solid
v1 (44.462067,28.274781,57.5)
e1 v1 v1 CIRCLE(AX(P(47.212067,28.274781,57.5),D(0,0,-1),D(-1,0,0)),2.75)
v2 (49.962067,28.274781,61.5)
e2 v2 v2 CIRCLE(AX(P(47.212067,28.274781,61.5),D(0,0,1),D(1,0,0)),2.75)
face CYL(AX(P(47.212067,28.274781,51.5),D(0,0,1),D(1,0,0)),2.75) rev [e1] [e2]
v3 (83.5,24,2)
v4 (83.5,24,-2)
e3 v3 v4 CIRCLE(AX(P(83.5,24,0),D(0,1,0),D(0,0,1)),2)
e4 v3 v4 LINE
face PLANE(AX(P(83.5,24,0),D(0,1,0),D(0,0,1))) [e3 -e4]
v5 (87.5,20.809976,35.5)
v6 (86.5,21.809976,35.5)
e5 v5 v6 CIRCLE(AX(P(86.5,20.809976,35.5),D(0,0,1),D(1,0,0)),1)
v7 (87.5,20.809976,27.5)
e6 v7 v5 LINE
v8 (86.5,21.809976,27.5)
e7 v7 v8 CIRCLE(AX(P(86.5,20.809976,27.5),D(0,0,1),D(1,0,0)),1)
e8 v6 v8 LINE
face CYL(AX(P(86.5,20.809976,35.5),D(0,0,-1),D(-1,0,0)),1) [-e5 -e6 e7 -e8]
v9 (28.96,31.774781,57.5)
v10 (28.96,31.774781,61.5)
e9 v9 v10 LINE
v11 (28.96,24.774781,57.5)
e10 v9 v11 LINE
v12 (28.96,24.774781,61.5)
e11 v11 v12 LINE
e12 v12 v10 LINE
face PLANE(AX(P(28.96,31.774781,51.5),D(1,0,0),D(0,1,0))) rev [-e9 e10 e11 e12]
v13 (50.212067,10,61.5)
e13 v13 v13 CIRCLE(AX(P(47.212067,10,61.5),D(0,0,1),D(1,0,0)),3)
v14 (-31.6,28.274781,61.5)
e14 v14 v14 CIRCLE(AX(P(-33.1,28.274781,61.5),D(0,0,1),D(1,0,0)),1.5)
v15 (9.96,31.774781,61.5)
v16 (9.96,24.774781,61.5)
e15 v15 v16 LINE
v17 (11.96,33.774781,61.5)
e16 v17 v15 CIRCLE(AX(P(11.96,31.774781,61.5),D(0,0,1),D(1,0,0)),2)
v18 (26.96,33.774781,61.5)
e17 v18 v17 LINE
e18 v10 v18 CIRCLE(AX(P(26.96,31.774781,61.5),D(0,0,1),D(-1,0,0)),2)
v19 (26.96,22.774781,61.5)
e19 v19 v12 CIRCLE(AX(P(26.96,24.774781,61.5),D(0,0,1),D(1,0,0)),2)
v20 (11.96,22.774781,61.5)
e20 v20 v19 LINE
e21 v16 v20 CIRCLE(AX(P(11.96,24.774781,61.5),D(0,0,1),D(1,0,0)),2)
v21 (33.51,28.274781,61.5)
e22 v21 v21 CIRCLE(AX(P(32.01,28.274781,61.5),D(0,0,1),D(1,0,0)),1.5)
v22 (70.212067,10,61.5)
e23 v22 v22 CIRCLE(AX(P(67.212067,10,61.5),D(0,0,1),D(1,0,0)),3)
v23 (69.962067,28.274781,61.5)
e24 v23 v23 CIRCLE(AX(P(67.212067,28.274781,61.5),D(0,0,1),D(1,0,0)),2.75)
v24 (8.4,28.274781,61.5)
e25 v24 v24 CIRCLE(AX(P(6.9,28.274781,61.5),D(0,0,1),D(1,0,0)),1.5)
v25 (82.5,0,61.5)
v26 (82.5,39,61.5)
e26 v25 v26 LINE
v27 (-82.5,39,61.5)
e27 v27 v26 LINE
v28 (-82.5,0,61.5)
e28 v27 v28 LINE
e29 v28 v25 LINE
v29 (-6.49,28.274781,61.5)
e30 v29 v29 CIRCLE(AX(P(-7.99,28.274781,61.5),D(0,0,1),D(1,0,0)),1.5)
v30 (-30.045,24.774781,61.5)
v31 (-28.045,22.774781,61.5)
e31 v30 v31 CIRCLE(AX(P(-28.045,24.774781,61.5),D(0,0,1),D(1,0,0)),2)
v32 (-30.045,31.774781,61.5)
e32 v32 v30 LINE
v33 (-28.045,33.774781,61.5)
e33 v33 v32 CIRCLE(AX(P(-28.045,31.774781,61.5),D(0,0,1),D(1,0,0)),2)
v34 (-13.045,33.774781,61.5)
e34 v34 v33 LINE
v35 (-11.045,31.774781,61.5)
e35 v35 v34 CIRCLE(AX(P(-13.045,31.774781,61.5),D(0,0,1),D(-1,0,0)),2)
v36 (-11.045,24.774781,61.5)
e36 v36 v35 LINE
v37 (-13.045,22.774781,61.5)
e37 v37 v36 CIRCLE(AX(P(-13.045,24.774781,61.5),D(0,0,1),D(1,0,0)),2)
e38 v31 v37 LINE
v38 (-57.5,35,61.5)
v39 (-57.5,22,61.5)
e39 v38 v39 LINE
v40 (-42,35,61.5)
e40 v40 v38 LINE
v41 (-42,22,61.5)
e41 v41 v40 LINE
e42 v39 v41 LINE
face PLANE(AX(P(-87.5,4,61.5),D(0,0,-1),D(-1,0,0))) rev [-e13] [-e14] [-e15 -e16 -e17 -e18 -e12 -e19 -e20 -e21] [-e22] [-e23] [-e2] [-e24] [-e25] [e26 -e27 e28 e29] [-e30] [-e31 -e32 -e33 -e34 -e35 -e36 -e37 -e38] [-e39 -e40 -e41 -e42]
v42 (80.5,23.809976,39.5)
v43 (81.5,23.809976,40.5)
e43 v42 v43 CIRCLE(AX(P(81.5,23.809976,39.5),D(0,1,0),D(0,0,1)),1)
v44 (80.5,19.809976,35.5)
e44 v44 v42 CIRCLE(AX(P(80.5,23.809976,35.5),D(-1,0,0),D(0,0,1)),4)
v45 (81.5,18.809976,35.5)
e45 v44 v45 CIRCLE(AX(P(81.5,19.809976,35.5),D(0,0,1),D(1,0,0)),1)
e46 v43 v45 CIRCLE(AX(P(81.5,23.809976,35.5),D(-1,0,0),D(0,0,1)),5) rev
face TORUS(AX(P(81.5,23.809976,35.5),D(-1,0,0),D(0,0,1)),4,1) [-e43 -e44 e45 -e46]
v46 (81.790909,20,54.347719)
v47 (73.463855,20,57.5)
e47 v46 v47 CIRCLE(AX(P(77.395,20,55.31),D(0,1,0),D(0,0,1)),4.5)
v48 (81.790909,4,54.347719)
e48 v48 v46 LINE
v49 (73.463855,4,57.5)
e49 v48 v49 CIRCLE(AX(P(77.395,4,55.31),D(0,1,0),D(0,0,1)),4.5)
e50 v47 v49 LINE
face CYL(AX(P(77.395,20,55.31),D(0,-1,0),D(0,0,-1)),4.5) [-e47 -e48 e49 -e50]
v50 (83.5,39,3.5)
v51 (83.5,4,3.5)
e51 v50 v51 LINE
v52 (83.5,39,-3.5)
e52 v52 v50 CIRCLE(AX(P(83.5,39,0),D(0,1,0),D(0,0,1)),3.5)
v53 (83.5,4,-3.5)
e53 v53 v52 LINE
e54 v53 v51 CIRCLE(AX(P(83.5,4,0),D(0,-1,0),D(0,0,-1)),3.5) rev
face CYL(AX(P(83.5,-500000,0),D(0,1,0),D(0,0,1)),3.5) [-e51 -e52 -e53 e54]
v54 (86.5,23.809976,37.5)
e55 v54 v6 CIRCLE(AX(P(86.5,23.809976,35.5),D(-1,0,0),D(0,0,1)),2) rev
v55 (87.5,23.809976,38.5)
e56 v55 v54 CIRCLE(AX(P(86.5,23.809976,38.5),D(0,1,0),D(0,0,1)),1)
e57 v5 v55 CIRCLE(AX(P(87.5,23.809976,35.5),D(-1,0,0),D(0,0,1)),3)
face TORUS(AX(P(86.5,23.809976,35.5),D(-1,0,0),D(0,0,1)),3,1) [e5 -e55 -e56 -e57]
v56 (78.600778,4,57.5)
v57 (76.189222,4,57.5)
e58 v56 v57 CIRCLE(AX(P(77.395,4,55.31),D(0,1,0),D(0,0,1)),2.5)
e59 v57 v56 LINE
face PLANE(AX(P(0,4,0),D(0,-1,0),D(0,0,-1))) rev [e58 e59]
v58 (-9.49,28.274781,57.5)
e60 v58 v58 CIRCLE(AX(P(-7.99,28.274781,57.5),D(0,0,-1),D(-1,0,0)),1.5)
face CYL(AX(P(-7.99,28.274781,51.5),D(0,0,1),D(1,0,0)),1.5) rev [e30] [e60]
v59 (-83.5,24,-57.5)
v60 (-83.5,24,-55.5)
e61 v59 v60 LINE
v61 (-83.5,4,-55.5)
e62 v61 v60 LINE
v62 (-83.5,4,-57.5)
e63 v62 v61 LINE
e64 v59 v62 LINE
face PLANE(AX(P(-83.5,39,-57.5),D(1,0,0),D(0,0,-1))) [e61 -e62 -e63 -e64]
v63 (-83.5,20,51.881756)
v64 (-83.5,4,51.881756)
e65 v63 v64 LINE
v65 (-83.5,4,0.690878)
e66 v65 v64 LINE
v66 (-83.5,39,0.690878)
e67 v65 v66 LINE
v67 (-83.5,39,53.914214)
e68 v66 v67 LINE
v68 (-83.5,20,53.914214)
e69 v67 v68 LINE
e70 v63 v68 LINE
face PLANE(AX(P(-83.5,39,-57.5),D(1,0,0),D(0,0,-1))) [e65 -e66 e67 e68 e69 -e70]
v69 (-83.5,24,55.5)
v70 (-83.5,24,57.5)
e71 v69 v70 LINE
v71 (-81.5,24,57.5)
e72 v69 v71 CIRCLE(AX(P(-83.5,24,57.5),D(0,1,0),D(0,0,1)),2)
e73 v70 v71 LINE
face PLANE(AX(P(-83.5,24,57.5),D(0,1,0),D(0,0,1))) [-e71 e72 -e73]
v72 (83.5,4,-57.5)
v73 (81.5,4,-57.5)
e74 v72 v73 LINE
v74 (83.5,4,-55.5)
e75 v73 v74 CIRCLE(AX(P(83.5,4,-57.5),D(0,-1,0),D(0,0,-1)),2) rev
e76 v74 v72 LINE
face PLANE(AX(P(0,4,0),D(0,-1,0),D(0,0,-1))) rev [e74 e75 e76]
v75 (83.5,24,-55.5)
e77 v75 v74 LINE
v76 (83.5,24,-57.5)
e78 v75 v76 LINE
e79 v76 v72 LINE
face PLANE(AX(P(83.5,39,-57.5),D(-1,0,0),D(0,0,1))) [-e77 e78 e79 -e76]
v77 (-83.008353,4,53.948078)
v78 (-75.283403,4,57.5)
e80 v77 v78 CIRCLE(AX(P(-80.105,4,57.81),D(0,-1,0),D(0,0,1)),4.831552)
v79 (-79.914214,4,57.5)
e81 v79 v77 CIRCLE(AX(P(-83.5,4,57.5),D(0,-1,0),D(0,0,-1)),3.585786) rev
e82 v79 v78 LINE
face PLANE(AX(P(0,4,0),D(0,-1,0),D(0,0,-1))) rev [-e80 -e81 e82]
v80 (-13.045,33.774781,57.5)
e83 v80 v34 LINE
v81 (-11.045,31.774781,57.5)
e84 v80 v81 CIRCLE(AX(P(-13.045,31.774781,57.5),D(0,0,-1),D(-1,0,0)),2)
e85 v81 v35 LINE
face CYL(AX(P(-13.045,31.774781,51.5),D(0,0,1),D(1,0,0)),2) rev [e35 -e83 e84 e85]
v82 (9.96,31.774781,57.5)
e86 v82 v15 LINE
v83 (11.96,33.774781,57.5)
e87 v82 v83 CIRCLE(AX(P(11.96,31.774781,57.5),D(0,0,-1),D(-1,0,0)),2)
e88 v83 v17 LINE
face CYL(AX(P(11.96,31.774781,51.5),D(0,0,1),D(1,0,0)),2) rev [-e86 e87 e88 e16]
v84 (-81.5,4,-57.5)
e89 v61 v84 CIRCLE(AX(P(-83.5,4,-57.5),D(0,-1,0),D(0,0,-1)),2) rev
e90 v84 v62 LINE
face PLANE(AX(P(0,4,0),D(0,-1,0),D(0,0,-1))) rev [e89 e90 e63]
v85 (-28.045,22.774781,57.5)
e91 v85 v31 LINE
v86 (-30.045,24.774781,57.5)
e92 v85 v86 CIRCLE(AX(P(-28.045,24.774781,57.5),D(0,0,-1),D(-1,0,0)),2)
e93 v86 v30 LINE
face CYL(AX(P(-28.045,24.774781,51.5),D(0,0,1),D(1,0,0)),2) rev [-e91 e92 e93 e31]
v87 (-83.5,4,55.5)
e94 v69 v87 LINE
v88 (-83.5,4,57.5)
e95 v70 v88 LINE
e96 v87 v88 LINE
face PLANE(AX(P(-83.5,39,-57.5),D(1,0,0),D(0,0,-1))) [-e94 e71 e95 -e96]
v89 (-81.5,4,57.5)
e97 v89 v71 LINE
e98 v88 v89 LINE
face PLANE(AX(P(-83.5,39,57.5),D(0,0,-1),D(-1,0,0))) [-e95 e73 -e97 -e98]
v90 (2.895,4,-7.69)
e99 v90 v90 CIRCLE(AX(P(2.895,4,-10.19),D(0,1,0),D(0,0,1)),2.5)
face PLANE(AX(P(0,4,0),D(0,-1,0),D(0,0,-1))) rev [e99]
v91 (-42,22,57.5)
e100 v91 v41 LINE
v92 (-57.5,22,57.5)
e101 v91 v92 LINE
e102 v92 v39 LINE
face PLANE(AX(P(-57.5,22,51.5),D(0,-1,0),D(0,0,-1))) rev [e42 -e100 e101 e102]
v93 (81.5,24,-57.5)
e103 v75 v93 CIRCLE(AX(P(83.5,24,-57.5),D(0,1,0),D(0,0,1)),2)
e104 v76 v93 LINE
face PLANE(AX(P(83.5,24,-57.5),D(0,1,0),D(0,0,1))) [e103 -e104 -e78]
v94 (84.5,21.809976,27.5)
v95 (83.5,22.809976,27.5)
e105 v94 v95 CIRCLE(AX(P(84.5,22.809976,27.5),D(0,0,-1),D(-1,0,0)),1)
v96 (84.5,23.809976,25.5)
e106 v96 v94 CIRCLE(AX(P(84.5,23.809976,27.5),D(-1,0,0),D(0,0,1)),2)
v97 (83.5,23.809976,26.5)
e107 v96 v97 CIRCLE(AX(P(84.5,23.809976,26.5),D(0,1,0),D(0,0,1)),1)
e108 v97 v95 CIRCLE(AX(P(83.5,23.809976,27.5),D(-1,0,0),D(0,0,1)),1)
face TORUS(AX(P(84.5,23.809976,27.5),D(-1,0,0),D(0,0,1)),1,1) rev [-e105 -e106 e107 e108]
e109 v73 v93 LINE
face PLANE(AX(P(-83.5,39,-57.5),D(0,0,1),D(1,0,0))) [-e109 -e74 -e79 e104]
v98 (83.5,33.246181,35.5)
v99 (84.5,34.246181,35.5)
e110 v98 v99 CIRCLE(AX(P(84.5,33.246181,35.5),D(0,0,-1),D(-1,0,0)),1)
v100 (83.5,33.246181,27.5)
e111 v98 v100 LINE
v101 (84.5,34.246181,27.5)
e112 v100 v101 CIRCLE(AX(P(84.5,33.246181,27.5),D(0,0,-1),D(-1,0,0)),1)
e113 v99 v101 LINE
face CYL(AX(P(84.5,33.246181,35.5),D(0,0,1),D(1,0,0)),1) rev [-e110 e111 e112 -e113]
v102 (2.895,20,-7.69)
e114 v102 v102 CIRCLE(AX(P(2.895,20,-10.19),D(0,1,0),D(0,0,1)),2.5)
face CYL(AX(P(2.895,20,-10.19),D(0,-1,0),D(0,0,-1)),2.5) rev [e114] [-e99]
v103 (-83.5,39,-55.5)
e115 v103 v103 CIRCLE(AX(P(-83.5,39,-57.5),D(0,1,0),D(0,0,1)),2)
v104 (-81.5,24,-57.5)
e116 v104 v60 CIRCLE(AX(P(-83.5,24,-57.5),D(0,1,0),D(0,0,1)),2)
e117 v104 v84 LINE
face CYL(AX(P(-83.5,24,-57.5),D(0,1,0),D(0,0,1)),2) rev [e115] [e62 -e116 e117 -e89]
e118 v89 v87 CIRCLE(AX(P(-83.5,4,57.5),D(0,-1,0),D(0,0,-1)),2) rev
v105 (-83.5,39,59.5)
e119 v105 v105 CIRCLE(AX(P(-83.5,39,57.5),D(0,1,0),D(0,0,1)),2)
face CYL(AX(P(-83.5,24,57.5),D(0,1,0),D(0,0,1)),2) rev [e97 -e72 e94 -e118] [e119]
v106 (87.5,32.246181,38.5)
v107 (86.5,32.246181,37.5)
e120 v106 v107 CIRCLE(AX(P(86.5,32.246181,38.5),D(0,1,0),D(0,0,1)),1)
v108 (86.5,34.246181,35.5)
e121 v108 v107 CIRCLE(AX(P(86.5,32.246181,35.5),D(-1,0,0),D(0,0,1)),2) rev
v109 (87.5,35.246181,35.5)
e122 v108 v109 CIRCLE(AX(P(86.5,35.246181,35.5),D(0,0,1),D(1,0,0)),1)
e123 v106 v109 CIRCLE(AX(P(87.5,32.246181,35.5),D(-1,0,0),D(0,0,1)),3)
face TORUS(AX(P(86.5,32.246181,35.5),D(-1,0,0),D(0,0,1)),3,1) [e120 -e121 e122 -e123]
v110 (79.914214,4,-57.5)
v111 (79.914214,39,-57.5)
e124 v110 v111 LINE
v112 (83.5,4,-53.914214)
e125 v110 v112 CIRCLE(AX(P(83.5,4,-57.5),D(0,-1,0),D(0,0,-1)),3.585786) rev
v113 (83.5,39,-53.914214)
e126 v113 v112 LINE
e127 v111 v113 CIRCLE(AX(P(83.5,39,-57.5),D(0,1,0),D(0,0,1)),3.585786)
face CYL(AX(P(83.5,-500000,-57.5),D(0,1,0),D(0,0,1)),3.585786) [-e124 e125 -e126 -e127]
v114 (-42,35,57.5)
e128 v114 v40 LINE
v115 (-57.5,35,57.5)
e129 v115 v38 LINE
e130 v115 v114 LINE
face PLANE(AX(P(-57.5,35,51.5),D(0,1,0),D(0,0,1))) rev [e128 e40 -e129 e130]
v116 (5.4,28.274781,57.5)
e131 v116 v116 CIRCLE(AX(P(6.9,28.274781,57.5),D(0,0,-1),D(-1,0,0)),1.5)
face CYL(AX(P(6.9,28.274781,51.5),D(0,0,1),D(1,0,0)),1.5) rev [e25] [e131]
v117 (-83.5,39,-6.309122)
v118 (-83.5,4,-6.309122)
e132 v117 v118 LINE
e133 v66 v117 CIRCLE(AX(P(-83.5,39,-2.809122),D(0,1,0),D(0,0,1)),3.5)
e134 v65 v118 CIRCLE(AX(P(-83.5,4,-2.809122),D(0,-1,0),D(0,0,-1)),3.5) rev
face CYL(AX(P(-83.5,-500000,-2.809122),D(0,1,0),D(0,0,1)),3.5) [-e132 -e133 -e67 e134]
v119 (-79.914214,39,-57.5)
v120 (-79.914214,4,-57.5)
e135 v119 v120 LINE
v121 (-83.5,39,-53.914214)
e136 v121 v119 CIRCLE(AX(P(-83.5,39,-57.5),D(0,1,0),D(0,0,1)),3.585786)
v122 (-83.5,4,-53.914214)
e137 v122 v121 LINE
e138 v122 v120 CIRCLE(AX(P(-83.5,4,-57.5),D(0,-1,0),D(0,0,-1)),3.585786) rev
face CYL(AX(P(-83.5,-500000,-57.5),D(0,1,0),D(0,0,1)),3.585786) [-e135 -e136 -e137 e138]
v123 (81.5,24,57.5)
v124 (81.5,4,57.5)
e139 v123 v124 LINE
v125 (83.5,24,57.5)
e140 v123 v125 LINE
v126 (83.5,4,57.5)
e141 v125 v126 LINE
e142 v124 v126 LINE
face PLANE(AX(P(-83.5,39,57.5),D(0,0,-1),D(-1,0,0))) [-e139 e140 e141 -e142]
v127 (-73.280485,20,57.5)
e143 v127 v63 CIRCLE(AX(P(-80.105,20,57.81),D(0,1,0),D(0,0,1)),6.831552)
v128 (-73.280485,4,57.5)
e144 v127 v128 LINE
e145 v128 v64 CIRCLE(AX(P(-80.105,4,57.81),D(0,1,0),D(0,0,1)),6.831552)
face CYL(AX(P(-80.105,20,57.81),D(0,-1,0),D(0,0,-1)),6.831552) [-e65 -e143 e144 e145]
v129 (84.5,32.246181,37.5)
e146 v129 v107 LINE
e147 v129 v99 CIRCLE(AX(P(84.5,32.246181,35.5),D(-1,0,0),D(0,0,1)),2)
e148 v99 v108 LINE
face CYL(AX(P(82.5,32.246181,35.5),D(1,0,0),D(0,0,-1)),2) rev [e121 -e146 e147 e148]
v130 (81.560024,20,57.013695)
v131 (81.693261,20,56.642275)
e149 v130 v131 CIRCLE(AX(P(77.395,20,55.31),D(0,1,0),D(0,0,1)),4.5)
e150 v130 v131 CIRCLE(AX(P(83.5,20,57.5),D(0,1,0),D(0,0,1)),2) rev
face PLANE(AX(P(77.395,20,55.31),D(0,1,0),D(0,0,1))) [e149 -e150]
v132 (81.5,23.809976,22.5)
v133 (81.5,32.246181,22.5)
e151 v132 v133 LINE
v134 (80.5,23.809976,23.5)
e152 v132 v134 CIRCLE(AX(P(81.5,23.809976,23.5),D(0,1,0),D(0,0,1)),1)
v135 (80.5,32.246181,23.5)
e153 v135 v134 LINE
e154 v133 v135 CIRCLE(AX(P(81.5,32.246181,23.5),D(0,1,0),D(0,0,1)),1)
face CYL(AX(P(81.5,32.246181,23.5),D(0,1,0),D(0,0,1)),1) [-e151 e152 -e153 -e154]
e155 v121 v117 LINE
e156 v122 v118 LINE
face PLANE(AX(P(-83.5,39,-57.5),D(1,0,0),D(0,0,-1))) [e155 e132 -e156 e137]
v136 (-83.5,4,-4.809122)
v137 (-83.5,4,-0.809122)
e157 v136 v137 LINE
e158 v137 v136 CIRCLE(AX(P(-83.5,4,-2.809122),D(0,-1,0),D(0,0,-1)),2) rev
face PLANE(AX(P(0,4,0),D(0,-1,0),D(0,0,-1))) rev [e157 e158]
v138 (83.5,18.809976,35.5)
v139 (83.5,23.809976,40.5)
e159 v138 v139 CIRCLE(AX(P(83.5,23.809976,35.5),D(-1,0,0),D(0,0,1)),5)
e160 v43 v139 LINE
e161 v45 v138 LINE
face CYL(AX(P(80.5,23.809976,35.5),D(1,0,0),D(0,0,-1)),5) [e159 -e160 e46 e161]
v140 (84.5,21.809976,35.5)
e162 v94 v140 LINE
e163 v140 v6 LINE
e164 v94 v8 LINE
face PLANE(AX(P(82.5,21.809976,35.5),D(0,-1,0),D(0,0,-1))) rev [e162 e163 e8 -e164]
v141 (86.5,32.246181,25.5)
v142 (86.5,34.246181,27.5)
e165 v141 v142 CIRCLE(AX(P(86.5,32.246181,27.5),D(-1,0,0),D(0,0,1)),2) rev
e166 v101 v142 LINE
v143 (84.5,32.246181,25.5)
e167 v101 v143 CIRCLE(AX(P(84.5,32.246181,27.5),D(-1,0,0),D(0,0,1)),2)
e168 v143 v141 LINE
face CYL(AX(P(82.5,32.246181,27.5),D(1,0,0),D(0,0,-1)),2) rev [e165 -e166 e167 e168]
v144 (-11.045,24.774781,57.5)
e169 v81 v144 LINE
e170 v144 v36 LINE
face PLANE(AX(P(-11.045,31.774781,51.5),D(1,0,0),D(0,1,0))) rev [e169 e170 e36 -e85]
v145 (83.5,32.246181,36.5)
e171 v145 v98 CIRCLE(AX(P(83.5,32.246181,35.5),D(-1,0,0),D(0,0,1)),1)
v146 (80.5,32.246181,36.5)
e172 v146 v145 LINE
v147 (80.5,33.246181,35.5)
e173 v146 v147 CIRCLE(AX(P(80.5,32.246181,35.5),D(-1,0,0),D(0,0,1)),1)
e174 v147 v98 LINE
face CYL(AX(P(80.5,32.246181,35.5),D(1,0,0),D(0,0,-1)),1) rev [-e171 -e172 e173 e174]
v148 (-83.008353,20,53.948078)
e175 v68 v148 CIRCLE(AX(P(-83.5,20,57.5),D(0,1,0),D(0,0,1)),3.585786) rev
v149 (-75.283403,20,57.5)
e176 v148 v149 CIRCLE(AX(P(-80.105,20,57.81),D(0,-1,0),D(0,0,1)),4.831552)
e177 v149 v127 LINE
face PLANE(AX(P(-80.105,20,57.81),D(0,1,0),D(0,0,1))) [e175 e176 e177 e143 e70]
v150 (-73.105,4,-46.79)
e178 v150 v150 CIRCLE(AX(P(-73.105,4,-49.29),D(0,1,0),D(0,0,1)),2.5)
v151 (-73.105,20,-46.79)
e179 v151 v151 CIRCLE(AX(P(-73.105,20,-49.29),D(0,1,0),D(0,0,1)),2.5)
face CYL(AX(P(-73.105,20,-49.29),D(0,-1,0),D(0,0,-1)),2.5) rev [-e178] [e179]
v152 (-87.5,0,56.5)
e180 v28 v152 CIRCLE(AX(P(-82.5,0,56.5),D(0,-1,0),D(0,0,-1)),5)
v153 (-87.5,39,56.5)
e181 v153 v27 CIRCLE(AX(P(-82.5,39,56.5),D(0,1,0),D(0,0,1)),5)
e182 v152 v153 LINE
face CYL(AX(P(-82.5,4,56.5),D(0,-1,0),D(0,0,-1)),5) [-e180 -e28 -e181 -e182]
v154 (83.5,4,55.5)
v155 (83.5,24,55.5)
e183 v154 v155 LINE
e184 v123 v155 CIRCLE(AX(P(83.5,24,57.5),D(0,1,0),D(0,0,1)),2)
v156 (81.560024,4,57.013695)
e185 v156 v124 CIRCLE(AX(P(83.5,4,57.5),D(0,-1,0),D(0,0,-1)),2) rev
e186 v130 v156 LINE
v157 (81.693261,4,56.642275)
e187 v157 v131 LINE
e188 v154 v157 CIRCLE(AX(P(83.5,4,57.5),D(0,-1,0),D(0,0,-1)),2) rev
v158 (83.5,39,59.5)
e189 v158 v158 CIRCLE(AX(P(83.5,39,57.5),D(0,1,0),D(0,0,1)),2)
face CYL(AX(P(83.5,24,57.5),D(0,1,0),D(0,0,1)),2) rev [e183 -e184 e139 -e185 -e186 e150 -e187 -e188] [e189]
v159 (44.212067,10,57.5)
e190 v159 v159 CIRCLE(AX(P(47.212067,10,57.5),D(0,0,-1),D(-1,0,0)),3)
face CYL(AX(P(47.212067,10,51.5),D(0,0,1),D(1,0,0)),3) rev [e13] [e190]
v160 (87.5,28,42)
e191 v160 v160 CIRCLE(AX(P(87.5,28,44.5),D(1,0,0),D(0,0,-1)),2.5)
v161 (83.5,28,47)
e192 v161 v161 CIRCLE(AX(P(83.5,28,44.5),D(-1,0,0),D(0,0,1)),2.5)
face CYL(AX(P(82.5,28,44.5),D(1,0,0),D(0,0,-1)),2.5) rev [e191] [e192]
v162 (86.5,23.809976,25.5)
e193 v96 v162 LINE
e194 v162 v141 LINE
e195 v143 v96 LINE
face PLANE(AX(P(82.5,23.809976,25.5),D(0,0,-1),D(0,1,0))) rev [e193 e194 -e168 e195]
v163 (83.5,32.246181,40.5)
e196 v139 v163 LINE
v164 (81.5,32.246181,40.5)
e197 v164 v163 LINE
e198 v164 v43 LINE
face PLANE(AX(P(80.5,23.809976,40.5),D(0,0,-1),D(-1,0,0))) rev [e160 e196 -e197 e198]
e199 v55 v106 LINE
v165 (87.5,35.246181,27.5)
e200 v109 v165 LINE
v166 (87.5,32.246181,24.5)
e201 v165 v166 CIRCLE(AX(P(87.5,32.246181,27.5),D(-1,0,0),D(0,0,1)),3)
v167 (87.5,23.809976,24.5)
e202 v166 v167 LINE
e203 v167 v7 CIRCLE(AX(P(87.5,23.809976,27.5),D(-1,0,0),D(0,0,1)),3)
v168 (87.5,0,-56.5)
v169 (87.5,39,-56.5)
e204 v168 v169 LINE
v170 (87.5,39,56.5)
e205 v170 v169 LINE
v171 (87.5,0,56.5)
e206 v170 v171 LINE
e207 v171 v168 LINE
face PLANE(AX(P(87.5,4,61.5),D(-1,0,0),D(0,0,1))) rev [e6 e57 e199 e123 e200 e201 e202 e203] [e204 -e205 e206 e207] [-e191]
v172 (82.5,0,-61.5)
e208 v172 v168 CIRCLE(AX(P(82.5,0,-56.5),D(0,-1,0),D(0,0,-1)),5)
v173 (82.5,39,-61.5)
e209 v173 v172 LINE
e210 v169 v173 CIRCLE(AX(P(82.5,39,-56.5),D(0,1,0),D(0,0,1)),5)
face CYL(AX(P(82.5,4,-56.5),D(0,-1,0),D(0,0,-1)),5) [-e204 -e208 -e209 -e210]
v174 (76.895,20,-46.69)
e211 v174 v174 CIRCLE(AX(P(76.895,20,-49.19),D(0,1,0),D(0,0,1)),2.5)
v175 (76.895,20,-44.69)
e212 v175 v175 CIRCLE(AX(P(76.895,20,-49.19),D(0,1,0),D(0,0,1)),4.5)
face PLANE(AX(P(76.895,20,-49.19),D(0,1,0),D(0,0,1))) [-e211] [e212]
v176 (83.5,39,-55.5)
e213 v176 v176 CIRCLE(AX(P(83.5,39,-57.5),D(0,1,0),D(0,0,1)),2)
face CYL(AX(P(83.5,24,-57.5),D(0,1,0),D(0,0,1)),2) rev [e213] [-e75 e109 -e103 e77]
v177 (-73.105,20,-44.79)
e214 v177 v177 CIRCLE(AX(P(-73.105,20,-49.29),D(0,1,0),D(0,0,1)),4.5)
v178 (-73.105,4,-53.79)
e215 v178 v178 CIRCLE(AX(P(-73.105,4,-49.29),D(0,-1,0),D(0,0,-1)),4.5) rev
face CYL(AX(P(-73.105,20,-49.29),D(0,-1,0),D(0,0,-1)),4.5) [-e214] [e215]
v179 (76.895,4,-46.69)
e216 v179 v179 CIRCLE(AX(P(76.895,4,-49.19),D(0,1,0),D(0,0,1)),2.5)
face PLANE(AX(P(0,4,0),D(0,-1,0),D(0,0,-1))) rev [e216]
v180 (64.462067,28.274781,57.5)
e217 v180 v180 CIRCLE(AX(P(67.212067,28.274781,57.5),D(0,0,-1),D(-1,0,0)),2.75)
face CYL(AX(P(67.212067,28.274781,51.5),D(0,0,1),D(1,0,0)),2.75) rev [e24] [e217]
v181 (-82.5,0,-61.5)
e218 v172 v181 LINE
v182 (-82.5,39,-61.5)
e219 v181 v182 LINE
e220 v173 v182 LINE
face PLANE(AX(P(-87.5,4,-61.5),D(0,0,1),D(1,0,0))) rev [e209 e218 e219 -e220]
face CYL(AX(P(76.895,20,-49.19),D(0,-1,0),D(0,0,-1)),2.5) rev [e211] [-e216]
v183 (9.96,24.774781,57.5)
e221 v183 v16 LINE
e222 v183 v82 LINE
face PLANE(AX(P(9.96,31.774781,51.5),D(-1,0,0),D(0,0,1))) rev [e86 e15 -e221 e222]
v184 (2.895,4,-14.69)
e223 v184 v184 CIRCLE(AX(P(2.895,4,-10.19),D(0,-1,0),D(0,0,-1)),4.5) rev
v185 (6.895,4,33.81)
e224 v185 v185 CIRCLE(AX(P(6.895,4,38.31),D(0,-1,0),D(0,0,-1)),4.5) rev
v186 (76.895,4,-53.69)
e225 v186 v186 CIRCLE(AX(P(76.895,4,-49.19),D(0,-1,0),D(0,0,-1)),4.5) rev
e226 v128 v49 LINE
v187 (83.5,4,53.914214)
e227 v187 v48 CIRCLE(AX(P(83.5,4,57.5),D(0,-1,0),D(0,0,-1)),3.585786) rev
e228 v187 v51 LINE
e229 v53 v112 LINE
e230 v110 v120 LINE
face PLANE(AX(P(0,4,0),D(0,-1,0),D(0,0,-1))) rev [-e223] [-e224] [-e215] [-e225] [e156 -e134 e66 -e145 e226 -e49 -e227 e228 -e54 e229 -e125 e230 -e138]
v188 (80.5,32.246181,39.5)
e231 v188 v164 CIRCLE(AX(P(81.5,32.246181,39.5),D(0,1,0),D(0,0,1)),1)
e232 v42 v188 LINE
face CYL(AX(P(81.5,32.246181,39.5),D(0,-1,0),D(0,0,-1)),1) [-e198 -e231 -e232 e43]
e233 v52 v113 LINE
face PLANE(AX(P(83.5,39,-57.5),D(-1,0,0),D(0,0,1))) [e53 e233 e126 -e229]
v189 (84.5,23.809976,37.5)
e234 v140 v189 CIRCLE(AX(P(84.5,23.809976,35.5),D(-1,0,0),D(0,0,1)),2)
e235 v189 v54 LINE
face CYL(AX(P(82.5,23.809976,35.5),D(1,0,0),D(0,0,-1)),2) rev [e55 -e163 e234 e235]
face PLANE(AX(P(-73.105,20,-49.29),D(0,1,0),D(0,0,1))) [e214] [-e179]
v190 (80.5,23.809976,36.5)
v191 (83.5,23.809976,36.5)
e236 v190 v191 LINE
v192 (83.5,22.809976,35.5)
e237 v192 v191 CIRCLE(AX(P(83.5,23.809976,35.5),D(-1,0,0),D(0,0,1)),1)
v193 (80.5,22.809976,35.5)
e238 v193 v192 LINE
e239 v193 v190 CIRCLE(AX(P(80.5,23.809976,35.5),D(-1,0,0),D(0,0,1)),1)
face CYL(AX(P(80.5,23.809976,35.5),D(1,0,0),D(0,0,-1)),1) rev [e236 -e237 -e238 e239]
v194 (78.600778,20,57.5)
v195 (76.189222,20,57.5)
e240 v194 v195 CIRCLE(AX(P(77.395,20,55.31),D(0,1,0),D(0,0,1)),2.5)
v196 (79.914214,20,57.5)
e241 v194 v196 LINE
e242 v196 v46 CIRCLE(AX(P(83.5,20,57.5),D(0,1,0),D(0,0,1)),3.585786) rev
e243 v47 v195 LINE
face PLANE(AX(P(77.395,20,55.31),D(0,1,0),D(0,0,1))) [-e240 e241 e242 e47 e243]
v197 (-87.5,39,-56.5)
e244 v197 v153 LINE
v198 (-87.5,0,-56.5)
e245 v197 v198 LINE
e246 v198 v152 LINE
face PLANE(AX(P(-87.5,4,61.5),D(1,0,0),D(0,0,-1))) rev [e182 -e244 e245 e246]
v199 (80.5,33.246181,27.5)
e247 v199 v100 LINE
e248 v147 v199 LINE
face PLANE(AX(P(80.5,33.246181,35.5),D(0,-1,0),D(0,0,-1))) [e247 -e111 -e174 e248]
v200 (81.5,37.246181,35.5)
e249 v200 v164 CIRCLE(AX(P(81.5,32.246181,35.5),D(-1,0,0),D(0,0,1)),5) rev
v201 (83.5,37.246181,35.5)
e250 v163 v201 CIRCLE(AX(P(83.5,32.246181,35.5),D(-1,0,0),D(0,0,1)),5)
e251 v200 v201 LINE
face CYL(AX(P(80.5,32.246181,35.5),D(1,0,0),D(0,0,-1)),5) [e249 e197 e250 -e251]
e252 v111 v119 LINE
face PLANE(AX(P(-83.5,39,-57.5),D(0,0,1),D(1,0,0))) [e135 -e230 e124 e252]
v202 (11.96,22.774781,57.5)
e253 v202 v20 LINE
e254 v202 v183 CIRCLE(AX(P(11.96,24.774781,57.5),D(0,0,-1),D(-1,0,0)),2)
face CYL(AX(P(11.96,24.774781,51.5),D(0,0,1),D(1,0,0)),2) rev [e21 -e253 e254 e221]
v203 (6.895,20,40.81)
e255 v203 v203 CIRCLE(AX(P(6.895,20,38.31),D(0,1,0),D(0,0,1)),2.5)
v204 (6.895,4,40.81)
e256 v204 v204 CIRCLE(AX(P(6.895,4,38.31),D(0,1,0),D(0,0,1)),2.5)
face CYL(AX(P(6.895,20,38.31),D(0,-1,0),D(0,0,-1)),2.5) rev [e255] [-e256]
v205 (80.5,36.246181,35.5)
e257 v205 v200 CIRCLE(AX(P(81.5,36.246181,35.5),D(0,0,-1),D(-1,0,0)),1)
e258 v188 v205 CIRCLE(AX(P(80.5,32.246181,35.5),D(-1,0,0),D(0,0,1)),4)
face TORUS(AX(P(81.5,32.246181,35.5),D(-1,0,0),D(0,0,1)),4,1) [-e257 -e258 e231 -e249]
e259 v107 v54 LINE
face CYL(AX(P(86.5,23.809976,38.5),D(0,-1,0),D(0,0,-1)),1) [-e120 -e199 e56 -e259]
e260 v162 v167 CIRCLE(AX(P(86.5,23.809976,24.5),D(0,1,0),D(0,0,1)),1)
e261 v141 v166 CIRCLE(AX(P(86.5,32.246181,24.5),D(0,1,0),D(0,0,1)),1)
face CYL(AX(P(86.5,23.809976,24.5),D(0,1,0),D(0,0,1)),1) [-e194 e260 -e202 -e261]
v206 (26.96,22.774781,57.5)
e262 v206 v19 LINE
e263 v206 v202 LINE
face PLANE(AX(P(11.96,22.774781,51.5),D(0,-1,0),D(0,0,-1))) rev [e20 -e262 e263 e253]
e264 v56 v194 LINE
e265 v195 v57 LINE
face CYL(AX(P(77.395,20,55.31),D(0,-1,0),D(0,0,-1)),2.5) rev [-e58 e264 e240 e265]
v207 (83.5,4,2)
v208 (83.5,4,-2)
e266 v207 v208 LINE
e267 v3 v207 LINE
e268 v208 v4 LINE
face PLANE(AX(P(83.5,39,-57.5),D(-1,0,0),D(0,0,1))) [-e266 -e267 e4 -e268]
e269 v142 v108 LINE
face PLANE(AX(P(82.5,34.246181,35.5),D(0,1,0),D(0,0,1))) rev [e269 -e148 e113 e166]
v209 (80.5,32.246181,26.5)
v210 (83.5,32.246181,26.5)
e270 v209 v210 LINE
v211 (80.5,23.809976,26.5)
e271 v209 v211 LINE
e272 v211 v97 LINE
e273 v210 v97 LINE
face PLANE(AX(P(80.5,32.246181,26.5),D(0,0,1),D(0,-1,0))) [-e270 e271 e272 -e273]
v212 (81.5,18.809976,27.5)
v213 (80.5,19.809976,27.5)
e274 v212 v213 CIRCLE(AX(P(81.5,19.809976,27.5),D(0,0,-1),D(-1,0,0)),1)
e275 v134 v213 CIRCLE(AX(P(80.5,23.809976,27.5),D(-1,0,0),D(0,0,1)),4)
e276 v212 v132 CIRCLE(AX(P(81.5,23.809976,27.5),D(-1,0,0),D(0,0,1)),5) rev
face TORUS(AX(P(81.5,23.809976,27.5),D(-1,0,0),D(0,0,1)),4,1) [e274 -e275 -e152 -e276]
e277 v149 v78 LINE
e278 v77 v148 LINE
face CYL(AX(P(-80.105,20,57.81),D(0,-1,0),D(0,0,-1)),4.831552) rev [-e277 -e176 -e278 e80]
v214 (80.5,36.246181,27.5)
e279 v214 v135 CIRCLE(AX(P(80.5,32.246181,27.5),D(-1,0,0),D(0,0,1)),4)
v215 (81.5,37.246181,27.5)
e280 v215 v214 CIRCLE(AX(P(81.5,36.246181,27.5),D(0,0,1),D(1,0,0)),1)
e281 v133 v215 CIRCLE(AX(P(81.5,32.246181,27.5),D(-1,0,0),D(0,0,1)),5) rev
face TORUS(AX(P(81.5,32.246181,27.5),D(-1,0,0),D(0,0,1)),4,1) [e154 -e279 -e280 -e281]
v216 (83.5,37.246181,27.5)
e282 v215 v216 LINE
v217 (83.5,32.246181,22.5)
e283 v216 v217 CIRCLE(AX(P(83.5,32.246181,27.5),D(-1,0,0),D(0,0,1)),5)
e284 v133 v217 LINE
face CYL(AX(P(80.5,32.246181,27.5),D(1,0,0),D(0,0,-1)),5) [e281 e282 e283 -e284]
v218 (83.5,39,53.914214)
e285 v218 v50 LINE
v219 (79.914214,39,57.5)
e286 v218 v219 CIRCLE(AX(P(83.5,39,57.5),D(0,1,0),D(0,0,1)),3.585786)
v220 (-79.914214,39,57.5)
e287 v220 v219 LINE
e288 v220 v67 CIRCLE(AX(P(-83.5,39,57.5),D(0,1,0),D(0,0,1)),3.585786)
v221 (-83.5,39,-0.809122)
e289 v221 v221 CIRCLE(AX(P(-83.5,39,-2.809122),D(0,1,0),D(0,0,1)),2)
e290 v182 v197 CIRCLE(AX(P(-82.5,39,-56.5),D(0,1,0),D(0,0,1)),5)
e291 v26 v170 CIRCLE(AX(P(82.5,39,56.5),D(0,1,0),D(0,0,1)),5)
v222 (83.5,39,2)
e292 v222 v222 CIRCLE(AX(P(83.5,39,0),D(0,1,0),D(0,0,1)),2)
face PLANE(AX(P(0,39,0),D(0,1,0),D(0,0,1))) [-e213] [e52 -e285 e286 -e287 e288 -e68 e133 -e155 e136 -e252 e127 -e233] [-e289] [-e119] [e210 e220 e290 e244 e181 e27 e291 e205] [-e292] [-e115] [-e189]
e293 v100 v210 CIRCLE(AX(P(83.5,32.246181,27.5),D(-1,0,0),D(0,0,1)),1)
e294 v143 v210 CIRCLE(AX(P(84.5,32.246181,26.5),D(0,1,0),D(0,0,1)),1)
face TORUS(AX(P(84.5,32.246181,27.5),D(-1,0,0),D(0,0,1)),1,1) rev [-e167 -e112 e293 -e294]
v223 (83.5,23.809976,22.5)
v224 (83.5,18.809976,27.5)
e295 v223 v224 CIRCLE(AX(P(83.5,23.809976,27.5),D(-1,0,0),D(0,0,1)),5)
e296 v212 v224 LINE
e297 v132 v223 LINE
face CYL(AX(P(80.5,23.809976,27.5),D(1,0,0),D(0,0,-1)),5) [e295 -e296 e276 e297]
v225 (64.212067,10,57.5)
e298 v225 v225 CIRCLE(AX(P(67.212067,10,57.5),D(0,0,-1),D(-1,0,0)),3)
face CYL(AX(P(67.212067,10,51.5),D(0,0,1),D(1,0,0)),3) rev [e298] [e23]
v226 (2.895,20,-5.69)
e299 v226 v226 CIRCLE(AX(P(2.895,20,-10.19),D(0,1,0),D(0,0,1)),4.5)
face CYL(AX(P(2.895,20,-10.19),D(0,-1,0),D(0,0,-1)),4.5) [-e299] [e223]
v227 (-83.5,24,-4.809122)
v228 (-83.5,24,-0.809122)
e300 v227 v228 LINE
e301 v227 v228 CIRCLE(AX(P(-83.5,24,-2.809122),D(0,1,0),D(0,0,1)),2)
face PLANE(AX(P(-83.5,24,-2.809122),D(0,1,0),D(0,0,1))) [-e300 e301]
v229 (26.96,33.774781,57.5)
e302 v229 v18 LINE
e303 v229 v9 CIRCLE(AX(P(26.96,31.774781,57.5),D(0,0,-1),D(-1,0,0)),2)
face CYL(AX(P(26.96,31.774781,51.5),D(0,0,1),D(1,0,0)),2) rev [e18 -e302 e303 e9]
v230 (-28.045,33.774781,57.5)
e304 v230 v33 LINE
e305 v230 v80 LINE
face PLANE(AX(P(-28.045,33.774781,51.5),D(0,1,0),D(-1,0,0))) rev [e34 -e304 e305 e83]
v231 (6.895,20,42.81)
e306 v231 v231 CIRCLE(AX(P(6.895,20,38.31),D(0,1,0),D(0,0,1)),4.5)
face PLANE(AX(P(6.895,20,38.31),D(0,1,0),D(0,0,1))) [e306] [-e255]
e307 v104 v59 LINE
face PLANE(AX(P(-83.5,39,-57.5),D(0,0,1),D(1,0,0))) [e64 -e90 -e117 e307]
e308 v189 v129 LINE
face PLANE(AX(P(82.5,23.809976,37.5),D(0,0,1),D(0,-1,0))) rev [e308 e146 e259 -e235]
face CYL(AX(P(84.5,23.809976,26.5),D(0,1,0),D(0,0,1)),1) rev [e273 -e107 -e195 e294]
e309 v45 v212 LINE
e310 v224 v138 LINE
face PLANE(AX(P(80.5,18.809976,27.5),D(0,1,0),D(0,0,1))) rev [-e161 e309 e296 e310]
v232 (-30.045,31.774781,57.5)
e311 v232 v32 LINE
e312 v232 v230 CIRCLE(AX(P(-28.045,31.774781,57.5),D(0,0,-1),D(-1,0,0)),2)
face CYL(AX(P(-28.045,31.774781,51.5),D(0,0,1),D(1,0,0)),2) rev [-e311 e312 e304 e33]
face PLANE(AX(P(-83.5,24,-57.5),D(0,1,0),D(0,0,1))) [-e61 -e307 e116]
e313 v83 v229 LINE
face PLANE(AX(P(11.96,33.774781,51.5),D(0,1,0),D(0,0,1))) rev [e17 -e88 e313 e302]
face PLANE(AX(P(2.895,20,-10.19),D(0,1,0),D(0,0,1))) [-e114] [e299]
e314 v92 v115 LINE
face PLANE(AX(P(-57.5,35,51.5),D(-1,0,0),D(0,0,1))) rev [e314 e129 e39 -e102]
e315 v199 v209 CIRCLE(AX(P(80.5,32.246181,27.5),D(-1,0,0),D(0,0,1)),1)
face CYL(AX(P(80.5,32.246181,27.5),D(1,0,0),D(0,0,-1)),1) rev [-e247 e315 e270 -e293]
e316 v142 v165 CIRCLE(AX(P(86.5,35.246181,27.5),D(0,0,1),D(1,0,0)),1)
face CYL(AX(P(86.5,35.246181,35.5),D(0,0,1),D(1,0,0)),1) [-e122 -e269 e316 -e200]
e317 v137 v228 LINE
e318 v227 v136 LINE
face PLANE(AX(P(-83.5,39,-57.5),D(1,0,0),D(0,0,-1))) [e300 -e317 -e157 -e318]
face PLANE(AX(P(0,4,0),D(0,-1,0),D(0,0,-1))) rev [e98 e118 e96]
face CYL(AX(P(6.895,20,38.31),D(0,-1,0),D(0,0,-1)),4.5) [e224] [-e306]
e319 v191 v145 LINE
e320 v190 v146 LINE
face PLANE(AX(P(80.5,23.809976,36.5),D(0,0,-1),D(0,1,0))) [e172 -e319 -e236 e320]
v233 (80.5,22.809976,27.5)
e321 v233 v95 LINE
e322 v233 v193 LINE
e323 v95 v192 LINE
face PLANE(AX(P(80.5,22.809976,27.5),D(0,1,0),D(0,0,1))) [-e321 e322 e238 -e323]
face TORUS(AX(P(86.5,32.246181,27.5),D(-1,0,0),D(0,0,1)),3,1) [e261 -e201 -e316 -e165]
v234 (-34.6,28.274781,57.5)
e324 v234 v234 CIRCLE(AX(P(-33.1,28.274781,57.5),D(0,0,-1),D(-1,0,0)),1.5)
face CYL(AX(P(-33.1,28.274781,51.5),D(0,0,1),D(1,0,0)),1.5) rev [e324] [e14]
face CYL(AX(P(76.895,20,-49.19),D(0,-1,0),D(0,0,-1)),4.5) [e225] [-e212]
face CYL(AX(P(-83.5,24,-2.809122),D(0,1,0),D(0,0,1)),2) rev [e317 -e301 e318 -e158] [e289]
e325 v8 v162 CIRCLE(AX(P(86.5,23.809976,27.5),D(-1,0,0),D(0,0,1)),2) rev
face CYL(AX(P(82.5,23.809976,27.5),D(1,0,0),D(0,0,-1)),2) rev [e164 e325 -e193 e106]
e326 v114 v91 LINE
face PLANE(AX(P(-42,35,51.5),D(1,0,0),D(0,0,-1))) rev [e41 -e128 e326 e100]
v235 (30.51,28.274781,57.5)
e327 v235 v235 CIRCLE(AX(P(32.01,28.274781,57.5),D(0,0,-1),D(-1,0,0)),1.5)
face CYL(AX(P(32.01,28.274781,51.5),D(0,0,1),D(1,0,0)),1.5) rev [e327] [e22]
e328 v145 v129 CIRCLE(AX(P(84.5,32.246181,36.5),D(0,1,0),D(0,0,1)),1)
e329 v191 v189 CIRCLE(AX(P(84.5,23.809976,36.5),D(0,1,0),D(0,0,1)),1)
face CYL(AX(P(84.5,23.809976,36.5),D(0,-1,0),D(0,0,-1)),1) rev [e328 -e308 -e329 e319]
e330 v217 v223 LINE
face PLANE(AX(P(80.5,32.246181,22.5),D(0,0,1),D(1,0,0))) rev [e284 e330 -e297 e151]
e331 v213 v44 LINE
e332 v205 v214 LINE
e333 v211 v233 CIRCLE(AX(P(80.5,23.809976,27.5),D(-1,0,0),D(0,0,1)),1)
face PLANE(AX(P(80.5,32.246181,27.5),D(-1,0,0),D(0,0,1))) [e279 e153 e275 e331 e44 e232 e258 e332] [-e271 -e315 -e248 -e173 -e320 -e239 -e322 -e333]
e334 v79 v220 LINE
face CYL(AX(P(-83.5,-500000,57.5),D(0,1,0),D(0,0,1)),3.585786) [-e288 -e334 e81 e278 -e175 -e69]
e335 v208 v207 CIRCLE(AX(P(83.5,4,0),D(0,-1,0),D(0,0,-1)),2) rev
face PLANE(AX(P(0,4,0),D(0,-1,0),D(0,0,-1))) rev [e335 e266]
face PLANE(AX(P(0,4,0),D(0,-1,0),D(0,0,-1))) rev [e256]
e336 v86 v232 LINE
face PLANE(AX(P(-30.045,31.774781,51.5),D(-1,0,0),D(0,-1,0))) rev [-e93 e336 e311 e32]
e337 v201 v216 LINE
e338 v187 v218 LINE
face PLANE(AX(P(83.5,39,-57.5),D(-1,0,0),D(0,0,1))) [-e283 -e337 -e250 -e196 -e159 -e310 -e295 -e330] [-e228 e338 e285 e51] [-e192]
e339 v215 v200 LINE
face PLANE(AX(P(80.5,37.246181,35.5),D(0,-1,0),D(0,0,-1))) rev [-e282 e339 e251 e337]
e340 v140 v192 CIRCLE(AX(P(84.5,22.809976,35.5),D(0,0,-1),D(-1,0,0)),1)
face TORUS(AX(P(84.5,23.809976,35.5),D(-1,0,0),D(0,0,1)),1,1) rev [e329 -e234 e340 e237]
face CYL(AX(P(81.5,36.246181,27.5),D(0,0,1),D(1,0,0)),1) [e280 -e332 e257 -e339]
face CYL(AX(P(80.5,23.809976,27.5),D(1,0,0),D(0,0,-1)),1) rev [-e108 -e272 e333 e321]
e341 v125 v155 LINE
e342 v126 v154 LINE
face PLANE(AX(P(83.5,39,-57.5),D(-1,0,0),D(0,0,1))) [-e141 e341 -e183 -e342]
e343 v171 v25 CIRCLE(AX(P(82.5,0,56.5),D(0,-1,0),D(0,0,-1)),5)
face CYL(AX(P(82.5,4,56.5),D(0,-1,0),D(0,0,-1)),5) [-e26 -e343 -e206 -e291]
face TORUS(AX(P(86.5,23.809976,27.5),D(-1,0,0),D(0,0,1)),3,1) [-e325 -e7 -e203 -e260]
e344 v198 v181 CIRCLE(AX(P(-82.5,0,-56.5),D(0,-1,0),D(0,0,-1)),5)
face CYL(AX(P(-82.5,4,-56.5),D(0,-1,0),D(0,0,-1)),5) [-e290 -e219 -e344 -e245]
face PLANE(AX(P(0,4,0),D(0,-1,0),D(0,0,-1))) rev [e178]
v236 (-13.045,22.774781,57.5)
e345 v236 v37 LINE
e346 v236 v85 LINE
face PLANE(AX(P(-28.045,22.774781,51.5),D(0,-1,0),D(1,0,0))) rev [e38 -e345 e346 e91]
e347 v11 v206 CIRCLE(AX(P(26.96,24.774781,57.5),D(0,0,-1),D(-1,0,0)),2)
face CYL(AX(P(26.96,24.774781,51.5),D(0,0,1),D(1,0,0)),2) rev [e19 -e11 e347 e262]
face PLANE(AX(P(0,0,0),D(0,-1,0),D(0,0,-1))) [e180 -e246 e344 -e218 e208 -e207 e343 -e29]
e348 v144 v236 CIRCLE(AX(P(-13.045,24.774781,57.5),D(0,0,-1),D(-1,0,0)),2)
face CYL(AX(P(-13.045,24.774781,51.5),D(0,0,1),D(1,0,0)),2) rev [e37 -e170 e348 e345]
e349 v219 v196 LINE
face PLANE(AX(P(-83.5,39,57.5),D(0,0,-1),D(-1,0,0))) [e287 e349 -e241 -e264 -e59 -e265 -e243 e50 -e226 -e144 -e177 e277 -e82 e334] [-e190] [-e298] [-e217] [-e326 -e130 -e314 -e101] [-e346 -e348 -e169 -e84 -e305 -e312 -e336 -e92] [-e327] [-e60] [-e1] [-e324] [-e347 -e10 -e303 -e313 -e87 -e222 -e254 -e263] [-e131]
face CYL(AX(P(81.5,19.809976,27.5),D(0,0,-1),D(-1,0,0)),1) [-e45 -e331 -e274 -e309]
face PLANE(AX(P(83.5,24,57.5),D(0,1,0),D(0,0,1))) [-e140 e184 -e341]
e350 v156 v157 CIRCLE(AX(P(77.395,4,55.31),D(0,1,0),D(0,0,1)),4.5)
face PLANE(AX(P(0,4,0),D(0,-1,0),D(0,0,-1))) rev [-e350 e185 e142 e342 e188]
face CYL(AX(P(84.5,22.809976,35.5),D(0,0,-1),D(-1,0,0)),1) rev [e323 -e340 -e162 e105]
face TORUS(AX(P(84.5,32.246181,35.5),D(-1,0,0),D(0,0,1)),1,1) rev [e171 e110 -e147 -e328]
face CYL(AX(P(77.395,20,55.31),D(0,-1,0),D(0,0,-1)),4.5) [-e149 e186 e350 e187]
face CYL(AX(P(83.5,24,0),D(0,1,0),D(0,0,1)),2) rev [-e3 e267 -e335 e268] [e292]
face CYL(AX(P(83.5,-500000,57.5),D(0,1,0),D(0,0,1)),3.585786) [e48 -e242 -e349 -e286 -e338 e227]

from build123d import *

# Parameters (mm, degrees)
IZIM1_W                     = 175
IZIM1_H                     = 123
Y_KSEKLIK_EKSTR_ZYON1_DEPTH = 4
IZIM2_W                     = 175
IZIM2_H                     = 123
IZIM2_W_2                   = 167
IZIM2_H_2                   = 115
Y_KSEKLIK_EKSTR_ZYON2_DEPTH = 35
IZIM3_R                     = 1.5
IZIM3_R_2                   = 2.75
IZIM3_R_3                   = 3
IZIM3_W                     = 15.5
IZIM3_H                     = 13
KES_EKSTR_ZYON1_DEPTH       = 10
IZIM5_R                     = 2.5
KES_EKSTR_ZYON3_DEPTH       = 5
RADYUS1_R                   = 5
IZIM6_R                     = 4.5
IZIM6_R_2                   = 2.5
Y_KSEKLIK_EKSTR_ZYON3_DEPTH = 16
IZIM7_R                     = 2
KES_EKSTR_ZYON4_DEPTH       = 15
Y_KSEKLIK_EKSTR_ZYON4_REACH = 115.84
IZIM8_R                     = 3.585786438
IZIM8_R_2                   = 2
IZIM8_R_3                   = 3.5
Y_KSEKLIK_EKSTR_ZYON5_DEPTH = 3
RADYUS2_R                   = 1
RADYUS3_R                   = 1
RADYUS4_R                   = 1


with BuildPart() as part:
    # Çizim1 → Yükseklik-Ekstrüzyon1 (new body)
    with BuildSketch(Plane(origin=(0, 0, 0), x_dir=(1, 0, 0), z_dir=(0, 1, 0))):
        Rectangle(IZIM1_W, IZIM1_H)
    extrude(amount=Y_KSEKLIK_EKSTR_ZYON1_DEPTH)

    # Çizim2 → Yükseklik-Ekstrüzyon2 (add)
    with BuildSketch(Plane(origin=(0, 4, 0), x_dir=(1, 0, 0), z_dir=(0, 1, 0))):
        Rectangle(IZIM2_W, IZIM2_H)
        Rectangle(IZIM2_W_2, IZIM2_H_2, mode=Mode.SUBTRACT)
    extrude(amount=Y_KSEKLIK_EKSTR_ZYON2_DEPTH)

    # Çizim3 → Kes-Ekstrüzyon1 (cut)
    with BuildSketch(Plane.XY.offset(61.5)):
        with Locations((-33.1, 28.27478079)):
            Circle(IZIM3_R)
        with Locations((-7.99, 28.27478079)):
            Circle(IZIM3_R)
        with Locations((6.9, 28.27478079)):
            Circle(IZIM3_R)
        with Locations((32.01, 28.27478079)):
            Circle(IZIM3_R)
        with Locations((47.212067108, 28.27478079)):
            Circle(IZIM3_R_2)
        with Locations((67.212067108, 28.27478079)):
            Circle(IZIM3_R_2)
        with Locations((47.212067108, 10)):
            Circle(IZIM3_R_3)
        with Locations((67.212067108, 10)):
            Circle(IZIM3_R_3)
        with Locations((-49.75, 28.5)):
            Rectangle(IZIM3_W, IZIM3_H)
        with BuildLine():
            Line((-28.045, 33.77478079), (-13.045, 33.77478079))
            ThreePointArc((-13.045, 33.77478079), (-11.630786438, 33.188994352), (-11.045, 31.77478079))
            Line((-11.045, 31.77478079), (-11.045, 24.77478079))
            ThreePointArc((-11.045, 24.77478079), (-11.630786438, 23.360567228), (-13.045, 22.77478079))
            Line((-13.045, 22.77478079), (-28.045, 22.77478079))
            ThreePointArc((-28.045, 22.77478079), (-29.459213562, 23.360567228), (-30.045, 24.77478079))
            Line((-30.045, 24.77478079), (-30.045, 31.77478079))
            ThreePointArc((-30.045, 31.77478079), (-29.459213562, 33.188994352), (-28.045, 33.77478079))
        make_face()
        with BuildLine():
            Line((11.96, 33.77478079), (26.96, 33.77478079))
            ThreePointArc((26.96, 33.77478079), (28.374213562, 33.188994352), (28.96, 31.77478079))
            Line((28.96, 31.77478079), (28.96, 24.77478079))
            ThreePointArc((28.96, 24.77478079), (28.374213562, 23.360567228), (26.96, 22.77478079))
            Line((26.96, 22.77478079), (11.96, 22.77478079))
            ThreePointArc((11.96, 22.77478079), (10.545786438, 23.360567228), (9.96, 24.77478079))
            Line((9.96, 24.77478079), (9.96, 31.77478079))
            ThreePointArc((9.96, 31.77478079), (10.545786438, 33.188994352), (11.96, 33.77478079))
        make_face()
    extrude(amount=-KES_EKSTR_ZYON1_DEPTH, mode=Mode.SUBTRACT)

    # Çizim5 → Kes-Ekstrüzyon3 (cut)
    with BuildSketch(Plane(origin=(87.5, 0, 0), x_dir=(0, 0, -1), z_dir=(1, 0, 0))):
        with Locations((-44.5, 28)):
            Circle(IZIM5_R)
        with BuildLine():
            Line((-35.5, 21.809976004), (-27.5, 21.809976004))
            ThreePointArc((-27.5, 21.809976004), (-26.085786438, 22.395762442), (-25.5, 23.809976004))
            Line((-25.5, 23.809976004), (-25.5, 32.246181166))
            ThreePointArc((-25.5, 32.246181166), (-26.085786438, 33.660394728), (-27.5, 34.246181166))
            Line((-27.5, 34.246181166), (-35.5, 34.246181166))
            ThreePointArc((-35.5, 34.246181166), (-36.914213562, 33.660394728), (-37.5, 32.246181166))
            Line((-37.5, 32.246181166), (-37.5, 23.809976004))
            ThreePointArc((-37.5, 23.809976004), (-36.914213562, 22.395762442), (-35.5, 21.809976004))
        make_face()
    extrude(amount=-KES_EKSTR_ZYON3_DEPTH, mode=Mode.SUBTRACT)

    # Radyus1
    radyus1_edges = [part.edges().sort_by_distance(p)[0] for p in [
        (-87.5, 19.5, -61.5),
        (87.5, 19.5, -61.5),
        (87.5, 19.5, 61.5),
        (-87.5, 19.5, 61.5),
    ]]
    fillet(radyus1_edges, radius=RADYUS1_R)

    # Çizim6 → Yükseklik-Ekstrüzyon3 (add)
    # profile 1 of 6: a face of its own
    with BuildSketch(Plane(origin=(0, 4, 0), x_dir=(1, 0, 0), z_dir=(0, 1, 0))):
        with Locations((77.395, -55.31)):
            Circle(IZIM6_R)
        with Locations((77.395, -55.31)):
            Circle(IZIM6_R_2, mode=Mode.SUBTRACT)
    # profile 2 of 6: a face of its own
    with BuildSketch(Plane(origin=(0, 4, 0), x_dir=(1, 0, 0), z_dir=(0, 1, 0))):
        with Locations(Location((-73.105, 49.29, 0), (0, 0, 90))):
            Circle(IZIM6_R)
        with Locations(Location((-73.105, 49.29, 0), (0, 0, 270))):
            Circle(IZIM6_R_2, mode=Mode.SUBTRACT)
    # profile 3 of 6: a face of its own
    with BuildSketch(Plane(origin=(0, 4, 0), x_dir=(1, 0, 0), z_dir=(0, 1, 0))):
        with Locations(Location((76.895, 49.19, 0), (0, 0, 90))):
            Circle(IZIM6_R)
        with Locations(Location((76.895, 49.19, 0), (0, 0, 270))):
            Circle(IZIM6_R_2, mode=Mode.SUBTRACT)
    # profile 4 of 6: a face of its own
    with BuildSketch(Plane(origin=(0, 4, 0), x_dir=(1, 0, 0), z_dir=(0, 1, 0))):
        with Locations(Location((2.895, 10.19, 0), (0, 0, 90))):
            Circle(IZIM6_R)
        with Locations(Location((2.895, 10.19, 0), (0, 0, 270))):
            Circle(IZIM6_R_2, mode=Mode.SUBTRACT)
    # profile 5 of 6: a face of its own
    with BuildSketch(Plane(origin=(0, 4, 0), x_dir=(1, 0, 0), z_dir=(0, 1, 0))):
        with Locations(Location((6.895, -38.31, 0), (0, 0, 90))):
            Circle(IZIM6_R)
        with Locations(Location((6.895, -38.31, 0), (0, 0, 270))):
            Circle(IZIM6_R_2, mode=Mode.SUBTRACT)
    # profile 6 of 6: a face of its own
    with BuildSketch(Plane(origin=(0, 4, 0), x_dir=(1, 0, 0), z_dir=(0, 1, 0))):
        with BuildLine():
            Line((-83.5, -54.372286737), (-83.5, -51.881755604))
            ThreePointArc((-83.5, -51.881755604), (-76.813866303, -51.823469652), (-73.280484881, -57.5))
            Line((-73.280484881, -57.5), (-75.283403016, -57.5))
            ThreePointArc((-75.283403016, -57.5), (-78.386150879, -53.294531566), (-83.5, -54.372286737))
        make_face()
    extrude(amount=Y_KSEKLIK_EKSTR_ZYON3_DEPTH)

    # Çizim7 → Kes-Ekstrüzyon4 (cut)
    with BuildSketch(Plane(origin=(0, 39, 0), x_dir=(1, 0, 0), z_dir=(0, 1, 0))):
        with Locations((-83.5, 57.5)):
            Circle(IZIM7_R)
        with Locations((83.5, 57.5)):
            Circle(IZIM7_R)
        with Locations((83.5, -57.5)):
            Circle(IZIM7_R)
        with Locations((-83.5, -57.5)):
            Circle(IZIM7_R)
        with Locations((-83.5, 2.809122198)):
            Circle(IZIM7_R)
        with Locations((83.5, 0)):
            Circle(IZIM7_R)
    extrude(amount=-KES_EKSTR_ZYON4_DEPTH, mode=Mode.SUBTRACT)

    # Çizim8 → Yükseklik-Ekstrüzyon4 (add, up to next)
    with BuildSketch(Plane(origin=(0, 39, 0), x_dir=(1, 0, 0), z_dir=(0, 1, 0)), mode=Mode.PRIVATE) as y_kseklik_ekstr_zyon4_sk1:
        with Locations((-83.5, 57.5)):
            Circle(IZIM8_R)
        with Locations(Location((-83.5, 57.5, 0), (0, 0, 270))):
            Circle(IZIM8_R_2, mode=Mode.SUBTRACT)
    y_kseklik_ekstr_zyon4_tool1 = extrude(y_kseklik_ekstr_zyon4_sk1.sketch, amount=-Y_KSEKLIK_EKSTR_ZYON4_REACH, mode=Mode.PRIVATE) - part.part
    # Çizim8 → Yükseklik-Ekstrüzyon4 (add, up to next)
    with BuildSketch(Plane(origin=(0, 39, 0), x_dir=(1, 0, 0), z_dir=(0, 1, 0)), mode=Mode.PRIVATE) as y_kseklik_ekstr_zyon4_sk2:
        with Locations((-83.5, -57.5)):
            Circle(IZIM8_R)
        with Locations(Location((-83.5, -57.5, 0), (0, 0, 270))):
            Circle(IZIM8_R_2, mode=Mode.SUBTRACT)
    y_kseklik_ekstr_zyon4_tool2 = extrude(y_kseklik_ekstr_zyon4_sk2.sketch, amount=-Y_KSEKLIK_EKSTR_ZYON4_REACH, mode=Mode.PRIVATE) - part.part
    # Çizim8 → Yükseklik-Ekstrüzyon4 (add, up to next)
    with BuildSketch(Plane(origin=(0, 39, 0), x_dir=(1, 0, 0), z_dir=(0, 1, 0)), mode=Mode.PRIVATE) as y_kseklik_ekstr_zyon4_sk3:
        with Locations((83.5, -57.5)):
            Circle(IZIM8_R)
        with Locations(Location((83.5, -57.5, 0), (0, 0, 270))):
            Circle(IZIM8_R_2, mode=Mode.SUBTRACT)
    y_kseklik_ekstr_zyon4_tool3 = extrude(y_kseklik_ekstr_zyon4_sk3.sketch, amount=-Y_KSEKLIK_EKSTR_ZYON4_REACH, mode=Mode.PRIVATE) - part.part
    # Çizim8 → Yükseklik-Ekstrüzyon4 (add, up to next)
    with BuildSketch(Plane(origin=(0, 39, 0), x_dir=(1, 0, 0), z_dir=(0, 1, 0)), mode=Mode.PRIVATE) as y_kseklik_ekstr_zyon4_sk4:
        with Locations((83.5, 0)):
            Circle(IZIM8_R_3)
        with Locations(Location((83.5, 0, 0), (0, 0, 270))):
            Circle(IZIM8_R_2, mode=Mode.SUBTRACT)
    y_kseklik_ekstr_zyon4_tool4 = extrude(y_kseklik_ekstr_zyon4_sk4.sketch, amount=-Y_KSEKLIK_EKSTR_ZYON4_REACH, mode=Mode.PRIVATE) - part.part
    # Çizim8 → Yükseklik-Ekstrüzyon4 (add, up to next)
    with BuildSketch(Plane(origin=(0, 39, 0), x_dir=(1, 0, 0), z_dir=(0, 1, 0)), mode=Mode.PRIVATE) as y_kseklik_ekstr_zyon4_sk5:
        with Locations((-83.5, 2.809122198)):
            Circle(IZIM8_R_3)
        with Locations(Location((-83.5, 2.809122198, 0), (0, 0, 270))):
            Circle(IZIM8_R_2, mode=Mode.SUBTRACT)
    y_kseklik_ekstr_zyon4_tool5 = extrude(y_kseklik_ekstr_zyon4_sk5.sketch, amount=-Y_KSEKLIK_EKSTR_ZYON4_REACH, mode=Mode.PRIVATE) - part.part
    # Çizim8 → Yükseklik-Ekstrüzyon4 (add, up to next)
    with BuildSketch(Plane(origin=(0, 39, 0), x_dir=(1, 0, 0), z_dir=(0, 1, 0)), mode=Mode.PRIVATE) as y_kseklik_ekstr_zyon4_sk6:
        with Locations((83.5, 57.5)):
            Circle(IZIM8_R)
        with Locations(Location((83.5, 57.5, 0), (0, 0, 270))):
            Circle(IZIM8_R_2, mode=Mode.SUBTRACT)
    y_kseklik_ekstr_zyon4_tool6 = extrude(y_kseklik_ekstr_zyon4_sk6.sketch, amount=-Y_KSEKLIK_EKSTR_ZYON4_REACH, mode=Mode.PRIVATE) - part.part
    add(y_kseklik_ekstr_zyon4_tool1.solids().sort_by_distance((-86.984365, 39, -57.5))[0])
    add(y_kseklik_ekstr_zyon4_tool2.solids().sort_by_distance((-86.984365, 39, 57.5))[0])
    add(y_kseklik_ekstr_zyon4_tool3.solids().sort_by_distance((80.015635, 39, 57.5))[0])
    add(y_kseklik_ekstr_zyon4_tool4.solids().sort_by_distance((80.098995, 39, 0))[0])
    add(y_kseklik_ekstr_zyon4_tool5.solids().sort_by_distance((-86.901005, 39, -2.809122))[0])
    add(y_kseklik_ekstr_zyon4_tool6.solids().sort_by_distance((80.015635, 39, -57.5))[0])

    # Çizim9 → Yükseklik-Ekstrüzyon5 (add)
    with BuildSketch(Plane.ZY.offset(-83.5)):
        with BuildLine():
            Line((22.5, 32.246181166), (22.5, 23.809976004))
            ThreePointArc((22.5, 23.809976004), (23.964466094, 20.274442098), (27.5, 18.809976004))
            Line((27.5, 18.809976004), (35.5, 18.809976004))
            ThreePointArc((35.5, 18.809976004), (39.035533906, 20.274442098), (40.5, 23.809976004))
            Line((40.5, 23.809976004), (40.5, 32.246181166))
            ThreePointArc((40.5, 32.246181166), (39.035533906, 35.781715072), (35.5, 37.246181166))
            Line((35.5, 37.246181166), (27.5, 37.246181166))
            ThreePointArc((27.5, 37.246181166), (23.964466094, 35.781715072), (22.5, 32.246181166))
        make_face()
        with BuildLine():
            Line((36.5, 23.809976004), (36.5, 32.246181166))
            ThreePointArc((36.5, 32.246181166), (36.207106781, 32.953287947), (35.5, 33.246181166))
            Line((35.5, 33.246181166), (27.5, 33.246181166))
            ThreePointArc((27.5, 33.246181166), (26.792893219, 32.953287947), (26.5, 32.246181166))
            Line((26.5, 32.246181166), (26.5, 23.809976004))
            ThreePointArc((26.5, 23.809976004), (26.792893219, 23.102869223), (27.5, 22.809976004))
            Line((27.5, 22.809976004), (35.5, 22.809976004))
            ThreePointArc((35.5, 22.809976004), (36.207106781, 23.102869223), (36.5, 23.809976004))
        make_face(mode=Mode.SUBTRACT)
    extrude(amount=Y_KSEKLIK_EKSTR_ZYON5_DEPTH)

    # Radyus2
    radyus2_edges = [part.edges().sort_by_distance(p)[0] for p in [
        (83.5, 21.809976004, 31.5),
        (83.5, 22.395762442, 26.085786438),
        (83.5, 28.028078585, 25.5),
        (83.5, 33.660394728, 26.085786438),
        (83.5, 34.246181166, 31.5),
        (83.5, 33.660394728, 36.914213562),
        (83.5, 28.028078585, 37.5),
        (83.5, 22.395762442, 36.914213562),
    ]]
    fillet(radyus2_edges, radius=RADYUS2_R - 0.0001)  # a hair under: the kernel refuses the full size

    # Radyus3
    radyus3_edges = [part.edges().sort_by_distance(p)[0] for p in [
        (80.5, 35.781715072, 23.964466094),
        (80.5, 28.028078585, 22.5),
        (80.5, 20.274442098, 23.964466094),
        (80.5, 18.809976004, 31.5),
        (80.5, 20.274442098, 39.035533906),
        (80.5, 28.028078585, 40.5),
        (80.5, 35.781715072, 39.035533906),
        (80.5, 37.246181166, 31.5),
    ]]
    fillet(radyus3_edges, radius=RADYUS3_R)

    # Radyus4
    radyus4_edges = [part.edges().sort_by_distance(p)[0] for p in [
        (87.5, 22.395762442, 36.914213562),
        (87.5, 21.809976004, 31.5),
        (87.5, 22.395762442, 26.085786438),
        (87.5, 28.028078585, 25.5),
        (87.5, 33.660394728, 26.085786438),
        (87.5, 34.246181166, 31.5),
        (87.5, 33.660394728, 36.914213562),
        (87.5, 28.028078585, 37.5),
    ]]
    fillet(radyus4_edges, radius=RADYUS4_R)


solid = part.part
